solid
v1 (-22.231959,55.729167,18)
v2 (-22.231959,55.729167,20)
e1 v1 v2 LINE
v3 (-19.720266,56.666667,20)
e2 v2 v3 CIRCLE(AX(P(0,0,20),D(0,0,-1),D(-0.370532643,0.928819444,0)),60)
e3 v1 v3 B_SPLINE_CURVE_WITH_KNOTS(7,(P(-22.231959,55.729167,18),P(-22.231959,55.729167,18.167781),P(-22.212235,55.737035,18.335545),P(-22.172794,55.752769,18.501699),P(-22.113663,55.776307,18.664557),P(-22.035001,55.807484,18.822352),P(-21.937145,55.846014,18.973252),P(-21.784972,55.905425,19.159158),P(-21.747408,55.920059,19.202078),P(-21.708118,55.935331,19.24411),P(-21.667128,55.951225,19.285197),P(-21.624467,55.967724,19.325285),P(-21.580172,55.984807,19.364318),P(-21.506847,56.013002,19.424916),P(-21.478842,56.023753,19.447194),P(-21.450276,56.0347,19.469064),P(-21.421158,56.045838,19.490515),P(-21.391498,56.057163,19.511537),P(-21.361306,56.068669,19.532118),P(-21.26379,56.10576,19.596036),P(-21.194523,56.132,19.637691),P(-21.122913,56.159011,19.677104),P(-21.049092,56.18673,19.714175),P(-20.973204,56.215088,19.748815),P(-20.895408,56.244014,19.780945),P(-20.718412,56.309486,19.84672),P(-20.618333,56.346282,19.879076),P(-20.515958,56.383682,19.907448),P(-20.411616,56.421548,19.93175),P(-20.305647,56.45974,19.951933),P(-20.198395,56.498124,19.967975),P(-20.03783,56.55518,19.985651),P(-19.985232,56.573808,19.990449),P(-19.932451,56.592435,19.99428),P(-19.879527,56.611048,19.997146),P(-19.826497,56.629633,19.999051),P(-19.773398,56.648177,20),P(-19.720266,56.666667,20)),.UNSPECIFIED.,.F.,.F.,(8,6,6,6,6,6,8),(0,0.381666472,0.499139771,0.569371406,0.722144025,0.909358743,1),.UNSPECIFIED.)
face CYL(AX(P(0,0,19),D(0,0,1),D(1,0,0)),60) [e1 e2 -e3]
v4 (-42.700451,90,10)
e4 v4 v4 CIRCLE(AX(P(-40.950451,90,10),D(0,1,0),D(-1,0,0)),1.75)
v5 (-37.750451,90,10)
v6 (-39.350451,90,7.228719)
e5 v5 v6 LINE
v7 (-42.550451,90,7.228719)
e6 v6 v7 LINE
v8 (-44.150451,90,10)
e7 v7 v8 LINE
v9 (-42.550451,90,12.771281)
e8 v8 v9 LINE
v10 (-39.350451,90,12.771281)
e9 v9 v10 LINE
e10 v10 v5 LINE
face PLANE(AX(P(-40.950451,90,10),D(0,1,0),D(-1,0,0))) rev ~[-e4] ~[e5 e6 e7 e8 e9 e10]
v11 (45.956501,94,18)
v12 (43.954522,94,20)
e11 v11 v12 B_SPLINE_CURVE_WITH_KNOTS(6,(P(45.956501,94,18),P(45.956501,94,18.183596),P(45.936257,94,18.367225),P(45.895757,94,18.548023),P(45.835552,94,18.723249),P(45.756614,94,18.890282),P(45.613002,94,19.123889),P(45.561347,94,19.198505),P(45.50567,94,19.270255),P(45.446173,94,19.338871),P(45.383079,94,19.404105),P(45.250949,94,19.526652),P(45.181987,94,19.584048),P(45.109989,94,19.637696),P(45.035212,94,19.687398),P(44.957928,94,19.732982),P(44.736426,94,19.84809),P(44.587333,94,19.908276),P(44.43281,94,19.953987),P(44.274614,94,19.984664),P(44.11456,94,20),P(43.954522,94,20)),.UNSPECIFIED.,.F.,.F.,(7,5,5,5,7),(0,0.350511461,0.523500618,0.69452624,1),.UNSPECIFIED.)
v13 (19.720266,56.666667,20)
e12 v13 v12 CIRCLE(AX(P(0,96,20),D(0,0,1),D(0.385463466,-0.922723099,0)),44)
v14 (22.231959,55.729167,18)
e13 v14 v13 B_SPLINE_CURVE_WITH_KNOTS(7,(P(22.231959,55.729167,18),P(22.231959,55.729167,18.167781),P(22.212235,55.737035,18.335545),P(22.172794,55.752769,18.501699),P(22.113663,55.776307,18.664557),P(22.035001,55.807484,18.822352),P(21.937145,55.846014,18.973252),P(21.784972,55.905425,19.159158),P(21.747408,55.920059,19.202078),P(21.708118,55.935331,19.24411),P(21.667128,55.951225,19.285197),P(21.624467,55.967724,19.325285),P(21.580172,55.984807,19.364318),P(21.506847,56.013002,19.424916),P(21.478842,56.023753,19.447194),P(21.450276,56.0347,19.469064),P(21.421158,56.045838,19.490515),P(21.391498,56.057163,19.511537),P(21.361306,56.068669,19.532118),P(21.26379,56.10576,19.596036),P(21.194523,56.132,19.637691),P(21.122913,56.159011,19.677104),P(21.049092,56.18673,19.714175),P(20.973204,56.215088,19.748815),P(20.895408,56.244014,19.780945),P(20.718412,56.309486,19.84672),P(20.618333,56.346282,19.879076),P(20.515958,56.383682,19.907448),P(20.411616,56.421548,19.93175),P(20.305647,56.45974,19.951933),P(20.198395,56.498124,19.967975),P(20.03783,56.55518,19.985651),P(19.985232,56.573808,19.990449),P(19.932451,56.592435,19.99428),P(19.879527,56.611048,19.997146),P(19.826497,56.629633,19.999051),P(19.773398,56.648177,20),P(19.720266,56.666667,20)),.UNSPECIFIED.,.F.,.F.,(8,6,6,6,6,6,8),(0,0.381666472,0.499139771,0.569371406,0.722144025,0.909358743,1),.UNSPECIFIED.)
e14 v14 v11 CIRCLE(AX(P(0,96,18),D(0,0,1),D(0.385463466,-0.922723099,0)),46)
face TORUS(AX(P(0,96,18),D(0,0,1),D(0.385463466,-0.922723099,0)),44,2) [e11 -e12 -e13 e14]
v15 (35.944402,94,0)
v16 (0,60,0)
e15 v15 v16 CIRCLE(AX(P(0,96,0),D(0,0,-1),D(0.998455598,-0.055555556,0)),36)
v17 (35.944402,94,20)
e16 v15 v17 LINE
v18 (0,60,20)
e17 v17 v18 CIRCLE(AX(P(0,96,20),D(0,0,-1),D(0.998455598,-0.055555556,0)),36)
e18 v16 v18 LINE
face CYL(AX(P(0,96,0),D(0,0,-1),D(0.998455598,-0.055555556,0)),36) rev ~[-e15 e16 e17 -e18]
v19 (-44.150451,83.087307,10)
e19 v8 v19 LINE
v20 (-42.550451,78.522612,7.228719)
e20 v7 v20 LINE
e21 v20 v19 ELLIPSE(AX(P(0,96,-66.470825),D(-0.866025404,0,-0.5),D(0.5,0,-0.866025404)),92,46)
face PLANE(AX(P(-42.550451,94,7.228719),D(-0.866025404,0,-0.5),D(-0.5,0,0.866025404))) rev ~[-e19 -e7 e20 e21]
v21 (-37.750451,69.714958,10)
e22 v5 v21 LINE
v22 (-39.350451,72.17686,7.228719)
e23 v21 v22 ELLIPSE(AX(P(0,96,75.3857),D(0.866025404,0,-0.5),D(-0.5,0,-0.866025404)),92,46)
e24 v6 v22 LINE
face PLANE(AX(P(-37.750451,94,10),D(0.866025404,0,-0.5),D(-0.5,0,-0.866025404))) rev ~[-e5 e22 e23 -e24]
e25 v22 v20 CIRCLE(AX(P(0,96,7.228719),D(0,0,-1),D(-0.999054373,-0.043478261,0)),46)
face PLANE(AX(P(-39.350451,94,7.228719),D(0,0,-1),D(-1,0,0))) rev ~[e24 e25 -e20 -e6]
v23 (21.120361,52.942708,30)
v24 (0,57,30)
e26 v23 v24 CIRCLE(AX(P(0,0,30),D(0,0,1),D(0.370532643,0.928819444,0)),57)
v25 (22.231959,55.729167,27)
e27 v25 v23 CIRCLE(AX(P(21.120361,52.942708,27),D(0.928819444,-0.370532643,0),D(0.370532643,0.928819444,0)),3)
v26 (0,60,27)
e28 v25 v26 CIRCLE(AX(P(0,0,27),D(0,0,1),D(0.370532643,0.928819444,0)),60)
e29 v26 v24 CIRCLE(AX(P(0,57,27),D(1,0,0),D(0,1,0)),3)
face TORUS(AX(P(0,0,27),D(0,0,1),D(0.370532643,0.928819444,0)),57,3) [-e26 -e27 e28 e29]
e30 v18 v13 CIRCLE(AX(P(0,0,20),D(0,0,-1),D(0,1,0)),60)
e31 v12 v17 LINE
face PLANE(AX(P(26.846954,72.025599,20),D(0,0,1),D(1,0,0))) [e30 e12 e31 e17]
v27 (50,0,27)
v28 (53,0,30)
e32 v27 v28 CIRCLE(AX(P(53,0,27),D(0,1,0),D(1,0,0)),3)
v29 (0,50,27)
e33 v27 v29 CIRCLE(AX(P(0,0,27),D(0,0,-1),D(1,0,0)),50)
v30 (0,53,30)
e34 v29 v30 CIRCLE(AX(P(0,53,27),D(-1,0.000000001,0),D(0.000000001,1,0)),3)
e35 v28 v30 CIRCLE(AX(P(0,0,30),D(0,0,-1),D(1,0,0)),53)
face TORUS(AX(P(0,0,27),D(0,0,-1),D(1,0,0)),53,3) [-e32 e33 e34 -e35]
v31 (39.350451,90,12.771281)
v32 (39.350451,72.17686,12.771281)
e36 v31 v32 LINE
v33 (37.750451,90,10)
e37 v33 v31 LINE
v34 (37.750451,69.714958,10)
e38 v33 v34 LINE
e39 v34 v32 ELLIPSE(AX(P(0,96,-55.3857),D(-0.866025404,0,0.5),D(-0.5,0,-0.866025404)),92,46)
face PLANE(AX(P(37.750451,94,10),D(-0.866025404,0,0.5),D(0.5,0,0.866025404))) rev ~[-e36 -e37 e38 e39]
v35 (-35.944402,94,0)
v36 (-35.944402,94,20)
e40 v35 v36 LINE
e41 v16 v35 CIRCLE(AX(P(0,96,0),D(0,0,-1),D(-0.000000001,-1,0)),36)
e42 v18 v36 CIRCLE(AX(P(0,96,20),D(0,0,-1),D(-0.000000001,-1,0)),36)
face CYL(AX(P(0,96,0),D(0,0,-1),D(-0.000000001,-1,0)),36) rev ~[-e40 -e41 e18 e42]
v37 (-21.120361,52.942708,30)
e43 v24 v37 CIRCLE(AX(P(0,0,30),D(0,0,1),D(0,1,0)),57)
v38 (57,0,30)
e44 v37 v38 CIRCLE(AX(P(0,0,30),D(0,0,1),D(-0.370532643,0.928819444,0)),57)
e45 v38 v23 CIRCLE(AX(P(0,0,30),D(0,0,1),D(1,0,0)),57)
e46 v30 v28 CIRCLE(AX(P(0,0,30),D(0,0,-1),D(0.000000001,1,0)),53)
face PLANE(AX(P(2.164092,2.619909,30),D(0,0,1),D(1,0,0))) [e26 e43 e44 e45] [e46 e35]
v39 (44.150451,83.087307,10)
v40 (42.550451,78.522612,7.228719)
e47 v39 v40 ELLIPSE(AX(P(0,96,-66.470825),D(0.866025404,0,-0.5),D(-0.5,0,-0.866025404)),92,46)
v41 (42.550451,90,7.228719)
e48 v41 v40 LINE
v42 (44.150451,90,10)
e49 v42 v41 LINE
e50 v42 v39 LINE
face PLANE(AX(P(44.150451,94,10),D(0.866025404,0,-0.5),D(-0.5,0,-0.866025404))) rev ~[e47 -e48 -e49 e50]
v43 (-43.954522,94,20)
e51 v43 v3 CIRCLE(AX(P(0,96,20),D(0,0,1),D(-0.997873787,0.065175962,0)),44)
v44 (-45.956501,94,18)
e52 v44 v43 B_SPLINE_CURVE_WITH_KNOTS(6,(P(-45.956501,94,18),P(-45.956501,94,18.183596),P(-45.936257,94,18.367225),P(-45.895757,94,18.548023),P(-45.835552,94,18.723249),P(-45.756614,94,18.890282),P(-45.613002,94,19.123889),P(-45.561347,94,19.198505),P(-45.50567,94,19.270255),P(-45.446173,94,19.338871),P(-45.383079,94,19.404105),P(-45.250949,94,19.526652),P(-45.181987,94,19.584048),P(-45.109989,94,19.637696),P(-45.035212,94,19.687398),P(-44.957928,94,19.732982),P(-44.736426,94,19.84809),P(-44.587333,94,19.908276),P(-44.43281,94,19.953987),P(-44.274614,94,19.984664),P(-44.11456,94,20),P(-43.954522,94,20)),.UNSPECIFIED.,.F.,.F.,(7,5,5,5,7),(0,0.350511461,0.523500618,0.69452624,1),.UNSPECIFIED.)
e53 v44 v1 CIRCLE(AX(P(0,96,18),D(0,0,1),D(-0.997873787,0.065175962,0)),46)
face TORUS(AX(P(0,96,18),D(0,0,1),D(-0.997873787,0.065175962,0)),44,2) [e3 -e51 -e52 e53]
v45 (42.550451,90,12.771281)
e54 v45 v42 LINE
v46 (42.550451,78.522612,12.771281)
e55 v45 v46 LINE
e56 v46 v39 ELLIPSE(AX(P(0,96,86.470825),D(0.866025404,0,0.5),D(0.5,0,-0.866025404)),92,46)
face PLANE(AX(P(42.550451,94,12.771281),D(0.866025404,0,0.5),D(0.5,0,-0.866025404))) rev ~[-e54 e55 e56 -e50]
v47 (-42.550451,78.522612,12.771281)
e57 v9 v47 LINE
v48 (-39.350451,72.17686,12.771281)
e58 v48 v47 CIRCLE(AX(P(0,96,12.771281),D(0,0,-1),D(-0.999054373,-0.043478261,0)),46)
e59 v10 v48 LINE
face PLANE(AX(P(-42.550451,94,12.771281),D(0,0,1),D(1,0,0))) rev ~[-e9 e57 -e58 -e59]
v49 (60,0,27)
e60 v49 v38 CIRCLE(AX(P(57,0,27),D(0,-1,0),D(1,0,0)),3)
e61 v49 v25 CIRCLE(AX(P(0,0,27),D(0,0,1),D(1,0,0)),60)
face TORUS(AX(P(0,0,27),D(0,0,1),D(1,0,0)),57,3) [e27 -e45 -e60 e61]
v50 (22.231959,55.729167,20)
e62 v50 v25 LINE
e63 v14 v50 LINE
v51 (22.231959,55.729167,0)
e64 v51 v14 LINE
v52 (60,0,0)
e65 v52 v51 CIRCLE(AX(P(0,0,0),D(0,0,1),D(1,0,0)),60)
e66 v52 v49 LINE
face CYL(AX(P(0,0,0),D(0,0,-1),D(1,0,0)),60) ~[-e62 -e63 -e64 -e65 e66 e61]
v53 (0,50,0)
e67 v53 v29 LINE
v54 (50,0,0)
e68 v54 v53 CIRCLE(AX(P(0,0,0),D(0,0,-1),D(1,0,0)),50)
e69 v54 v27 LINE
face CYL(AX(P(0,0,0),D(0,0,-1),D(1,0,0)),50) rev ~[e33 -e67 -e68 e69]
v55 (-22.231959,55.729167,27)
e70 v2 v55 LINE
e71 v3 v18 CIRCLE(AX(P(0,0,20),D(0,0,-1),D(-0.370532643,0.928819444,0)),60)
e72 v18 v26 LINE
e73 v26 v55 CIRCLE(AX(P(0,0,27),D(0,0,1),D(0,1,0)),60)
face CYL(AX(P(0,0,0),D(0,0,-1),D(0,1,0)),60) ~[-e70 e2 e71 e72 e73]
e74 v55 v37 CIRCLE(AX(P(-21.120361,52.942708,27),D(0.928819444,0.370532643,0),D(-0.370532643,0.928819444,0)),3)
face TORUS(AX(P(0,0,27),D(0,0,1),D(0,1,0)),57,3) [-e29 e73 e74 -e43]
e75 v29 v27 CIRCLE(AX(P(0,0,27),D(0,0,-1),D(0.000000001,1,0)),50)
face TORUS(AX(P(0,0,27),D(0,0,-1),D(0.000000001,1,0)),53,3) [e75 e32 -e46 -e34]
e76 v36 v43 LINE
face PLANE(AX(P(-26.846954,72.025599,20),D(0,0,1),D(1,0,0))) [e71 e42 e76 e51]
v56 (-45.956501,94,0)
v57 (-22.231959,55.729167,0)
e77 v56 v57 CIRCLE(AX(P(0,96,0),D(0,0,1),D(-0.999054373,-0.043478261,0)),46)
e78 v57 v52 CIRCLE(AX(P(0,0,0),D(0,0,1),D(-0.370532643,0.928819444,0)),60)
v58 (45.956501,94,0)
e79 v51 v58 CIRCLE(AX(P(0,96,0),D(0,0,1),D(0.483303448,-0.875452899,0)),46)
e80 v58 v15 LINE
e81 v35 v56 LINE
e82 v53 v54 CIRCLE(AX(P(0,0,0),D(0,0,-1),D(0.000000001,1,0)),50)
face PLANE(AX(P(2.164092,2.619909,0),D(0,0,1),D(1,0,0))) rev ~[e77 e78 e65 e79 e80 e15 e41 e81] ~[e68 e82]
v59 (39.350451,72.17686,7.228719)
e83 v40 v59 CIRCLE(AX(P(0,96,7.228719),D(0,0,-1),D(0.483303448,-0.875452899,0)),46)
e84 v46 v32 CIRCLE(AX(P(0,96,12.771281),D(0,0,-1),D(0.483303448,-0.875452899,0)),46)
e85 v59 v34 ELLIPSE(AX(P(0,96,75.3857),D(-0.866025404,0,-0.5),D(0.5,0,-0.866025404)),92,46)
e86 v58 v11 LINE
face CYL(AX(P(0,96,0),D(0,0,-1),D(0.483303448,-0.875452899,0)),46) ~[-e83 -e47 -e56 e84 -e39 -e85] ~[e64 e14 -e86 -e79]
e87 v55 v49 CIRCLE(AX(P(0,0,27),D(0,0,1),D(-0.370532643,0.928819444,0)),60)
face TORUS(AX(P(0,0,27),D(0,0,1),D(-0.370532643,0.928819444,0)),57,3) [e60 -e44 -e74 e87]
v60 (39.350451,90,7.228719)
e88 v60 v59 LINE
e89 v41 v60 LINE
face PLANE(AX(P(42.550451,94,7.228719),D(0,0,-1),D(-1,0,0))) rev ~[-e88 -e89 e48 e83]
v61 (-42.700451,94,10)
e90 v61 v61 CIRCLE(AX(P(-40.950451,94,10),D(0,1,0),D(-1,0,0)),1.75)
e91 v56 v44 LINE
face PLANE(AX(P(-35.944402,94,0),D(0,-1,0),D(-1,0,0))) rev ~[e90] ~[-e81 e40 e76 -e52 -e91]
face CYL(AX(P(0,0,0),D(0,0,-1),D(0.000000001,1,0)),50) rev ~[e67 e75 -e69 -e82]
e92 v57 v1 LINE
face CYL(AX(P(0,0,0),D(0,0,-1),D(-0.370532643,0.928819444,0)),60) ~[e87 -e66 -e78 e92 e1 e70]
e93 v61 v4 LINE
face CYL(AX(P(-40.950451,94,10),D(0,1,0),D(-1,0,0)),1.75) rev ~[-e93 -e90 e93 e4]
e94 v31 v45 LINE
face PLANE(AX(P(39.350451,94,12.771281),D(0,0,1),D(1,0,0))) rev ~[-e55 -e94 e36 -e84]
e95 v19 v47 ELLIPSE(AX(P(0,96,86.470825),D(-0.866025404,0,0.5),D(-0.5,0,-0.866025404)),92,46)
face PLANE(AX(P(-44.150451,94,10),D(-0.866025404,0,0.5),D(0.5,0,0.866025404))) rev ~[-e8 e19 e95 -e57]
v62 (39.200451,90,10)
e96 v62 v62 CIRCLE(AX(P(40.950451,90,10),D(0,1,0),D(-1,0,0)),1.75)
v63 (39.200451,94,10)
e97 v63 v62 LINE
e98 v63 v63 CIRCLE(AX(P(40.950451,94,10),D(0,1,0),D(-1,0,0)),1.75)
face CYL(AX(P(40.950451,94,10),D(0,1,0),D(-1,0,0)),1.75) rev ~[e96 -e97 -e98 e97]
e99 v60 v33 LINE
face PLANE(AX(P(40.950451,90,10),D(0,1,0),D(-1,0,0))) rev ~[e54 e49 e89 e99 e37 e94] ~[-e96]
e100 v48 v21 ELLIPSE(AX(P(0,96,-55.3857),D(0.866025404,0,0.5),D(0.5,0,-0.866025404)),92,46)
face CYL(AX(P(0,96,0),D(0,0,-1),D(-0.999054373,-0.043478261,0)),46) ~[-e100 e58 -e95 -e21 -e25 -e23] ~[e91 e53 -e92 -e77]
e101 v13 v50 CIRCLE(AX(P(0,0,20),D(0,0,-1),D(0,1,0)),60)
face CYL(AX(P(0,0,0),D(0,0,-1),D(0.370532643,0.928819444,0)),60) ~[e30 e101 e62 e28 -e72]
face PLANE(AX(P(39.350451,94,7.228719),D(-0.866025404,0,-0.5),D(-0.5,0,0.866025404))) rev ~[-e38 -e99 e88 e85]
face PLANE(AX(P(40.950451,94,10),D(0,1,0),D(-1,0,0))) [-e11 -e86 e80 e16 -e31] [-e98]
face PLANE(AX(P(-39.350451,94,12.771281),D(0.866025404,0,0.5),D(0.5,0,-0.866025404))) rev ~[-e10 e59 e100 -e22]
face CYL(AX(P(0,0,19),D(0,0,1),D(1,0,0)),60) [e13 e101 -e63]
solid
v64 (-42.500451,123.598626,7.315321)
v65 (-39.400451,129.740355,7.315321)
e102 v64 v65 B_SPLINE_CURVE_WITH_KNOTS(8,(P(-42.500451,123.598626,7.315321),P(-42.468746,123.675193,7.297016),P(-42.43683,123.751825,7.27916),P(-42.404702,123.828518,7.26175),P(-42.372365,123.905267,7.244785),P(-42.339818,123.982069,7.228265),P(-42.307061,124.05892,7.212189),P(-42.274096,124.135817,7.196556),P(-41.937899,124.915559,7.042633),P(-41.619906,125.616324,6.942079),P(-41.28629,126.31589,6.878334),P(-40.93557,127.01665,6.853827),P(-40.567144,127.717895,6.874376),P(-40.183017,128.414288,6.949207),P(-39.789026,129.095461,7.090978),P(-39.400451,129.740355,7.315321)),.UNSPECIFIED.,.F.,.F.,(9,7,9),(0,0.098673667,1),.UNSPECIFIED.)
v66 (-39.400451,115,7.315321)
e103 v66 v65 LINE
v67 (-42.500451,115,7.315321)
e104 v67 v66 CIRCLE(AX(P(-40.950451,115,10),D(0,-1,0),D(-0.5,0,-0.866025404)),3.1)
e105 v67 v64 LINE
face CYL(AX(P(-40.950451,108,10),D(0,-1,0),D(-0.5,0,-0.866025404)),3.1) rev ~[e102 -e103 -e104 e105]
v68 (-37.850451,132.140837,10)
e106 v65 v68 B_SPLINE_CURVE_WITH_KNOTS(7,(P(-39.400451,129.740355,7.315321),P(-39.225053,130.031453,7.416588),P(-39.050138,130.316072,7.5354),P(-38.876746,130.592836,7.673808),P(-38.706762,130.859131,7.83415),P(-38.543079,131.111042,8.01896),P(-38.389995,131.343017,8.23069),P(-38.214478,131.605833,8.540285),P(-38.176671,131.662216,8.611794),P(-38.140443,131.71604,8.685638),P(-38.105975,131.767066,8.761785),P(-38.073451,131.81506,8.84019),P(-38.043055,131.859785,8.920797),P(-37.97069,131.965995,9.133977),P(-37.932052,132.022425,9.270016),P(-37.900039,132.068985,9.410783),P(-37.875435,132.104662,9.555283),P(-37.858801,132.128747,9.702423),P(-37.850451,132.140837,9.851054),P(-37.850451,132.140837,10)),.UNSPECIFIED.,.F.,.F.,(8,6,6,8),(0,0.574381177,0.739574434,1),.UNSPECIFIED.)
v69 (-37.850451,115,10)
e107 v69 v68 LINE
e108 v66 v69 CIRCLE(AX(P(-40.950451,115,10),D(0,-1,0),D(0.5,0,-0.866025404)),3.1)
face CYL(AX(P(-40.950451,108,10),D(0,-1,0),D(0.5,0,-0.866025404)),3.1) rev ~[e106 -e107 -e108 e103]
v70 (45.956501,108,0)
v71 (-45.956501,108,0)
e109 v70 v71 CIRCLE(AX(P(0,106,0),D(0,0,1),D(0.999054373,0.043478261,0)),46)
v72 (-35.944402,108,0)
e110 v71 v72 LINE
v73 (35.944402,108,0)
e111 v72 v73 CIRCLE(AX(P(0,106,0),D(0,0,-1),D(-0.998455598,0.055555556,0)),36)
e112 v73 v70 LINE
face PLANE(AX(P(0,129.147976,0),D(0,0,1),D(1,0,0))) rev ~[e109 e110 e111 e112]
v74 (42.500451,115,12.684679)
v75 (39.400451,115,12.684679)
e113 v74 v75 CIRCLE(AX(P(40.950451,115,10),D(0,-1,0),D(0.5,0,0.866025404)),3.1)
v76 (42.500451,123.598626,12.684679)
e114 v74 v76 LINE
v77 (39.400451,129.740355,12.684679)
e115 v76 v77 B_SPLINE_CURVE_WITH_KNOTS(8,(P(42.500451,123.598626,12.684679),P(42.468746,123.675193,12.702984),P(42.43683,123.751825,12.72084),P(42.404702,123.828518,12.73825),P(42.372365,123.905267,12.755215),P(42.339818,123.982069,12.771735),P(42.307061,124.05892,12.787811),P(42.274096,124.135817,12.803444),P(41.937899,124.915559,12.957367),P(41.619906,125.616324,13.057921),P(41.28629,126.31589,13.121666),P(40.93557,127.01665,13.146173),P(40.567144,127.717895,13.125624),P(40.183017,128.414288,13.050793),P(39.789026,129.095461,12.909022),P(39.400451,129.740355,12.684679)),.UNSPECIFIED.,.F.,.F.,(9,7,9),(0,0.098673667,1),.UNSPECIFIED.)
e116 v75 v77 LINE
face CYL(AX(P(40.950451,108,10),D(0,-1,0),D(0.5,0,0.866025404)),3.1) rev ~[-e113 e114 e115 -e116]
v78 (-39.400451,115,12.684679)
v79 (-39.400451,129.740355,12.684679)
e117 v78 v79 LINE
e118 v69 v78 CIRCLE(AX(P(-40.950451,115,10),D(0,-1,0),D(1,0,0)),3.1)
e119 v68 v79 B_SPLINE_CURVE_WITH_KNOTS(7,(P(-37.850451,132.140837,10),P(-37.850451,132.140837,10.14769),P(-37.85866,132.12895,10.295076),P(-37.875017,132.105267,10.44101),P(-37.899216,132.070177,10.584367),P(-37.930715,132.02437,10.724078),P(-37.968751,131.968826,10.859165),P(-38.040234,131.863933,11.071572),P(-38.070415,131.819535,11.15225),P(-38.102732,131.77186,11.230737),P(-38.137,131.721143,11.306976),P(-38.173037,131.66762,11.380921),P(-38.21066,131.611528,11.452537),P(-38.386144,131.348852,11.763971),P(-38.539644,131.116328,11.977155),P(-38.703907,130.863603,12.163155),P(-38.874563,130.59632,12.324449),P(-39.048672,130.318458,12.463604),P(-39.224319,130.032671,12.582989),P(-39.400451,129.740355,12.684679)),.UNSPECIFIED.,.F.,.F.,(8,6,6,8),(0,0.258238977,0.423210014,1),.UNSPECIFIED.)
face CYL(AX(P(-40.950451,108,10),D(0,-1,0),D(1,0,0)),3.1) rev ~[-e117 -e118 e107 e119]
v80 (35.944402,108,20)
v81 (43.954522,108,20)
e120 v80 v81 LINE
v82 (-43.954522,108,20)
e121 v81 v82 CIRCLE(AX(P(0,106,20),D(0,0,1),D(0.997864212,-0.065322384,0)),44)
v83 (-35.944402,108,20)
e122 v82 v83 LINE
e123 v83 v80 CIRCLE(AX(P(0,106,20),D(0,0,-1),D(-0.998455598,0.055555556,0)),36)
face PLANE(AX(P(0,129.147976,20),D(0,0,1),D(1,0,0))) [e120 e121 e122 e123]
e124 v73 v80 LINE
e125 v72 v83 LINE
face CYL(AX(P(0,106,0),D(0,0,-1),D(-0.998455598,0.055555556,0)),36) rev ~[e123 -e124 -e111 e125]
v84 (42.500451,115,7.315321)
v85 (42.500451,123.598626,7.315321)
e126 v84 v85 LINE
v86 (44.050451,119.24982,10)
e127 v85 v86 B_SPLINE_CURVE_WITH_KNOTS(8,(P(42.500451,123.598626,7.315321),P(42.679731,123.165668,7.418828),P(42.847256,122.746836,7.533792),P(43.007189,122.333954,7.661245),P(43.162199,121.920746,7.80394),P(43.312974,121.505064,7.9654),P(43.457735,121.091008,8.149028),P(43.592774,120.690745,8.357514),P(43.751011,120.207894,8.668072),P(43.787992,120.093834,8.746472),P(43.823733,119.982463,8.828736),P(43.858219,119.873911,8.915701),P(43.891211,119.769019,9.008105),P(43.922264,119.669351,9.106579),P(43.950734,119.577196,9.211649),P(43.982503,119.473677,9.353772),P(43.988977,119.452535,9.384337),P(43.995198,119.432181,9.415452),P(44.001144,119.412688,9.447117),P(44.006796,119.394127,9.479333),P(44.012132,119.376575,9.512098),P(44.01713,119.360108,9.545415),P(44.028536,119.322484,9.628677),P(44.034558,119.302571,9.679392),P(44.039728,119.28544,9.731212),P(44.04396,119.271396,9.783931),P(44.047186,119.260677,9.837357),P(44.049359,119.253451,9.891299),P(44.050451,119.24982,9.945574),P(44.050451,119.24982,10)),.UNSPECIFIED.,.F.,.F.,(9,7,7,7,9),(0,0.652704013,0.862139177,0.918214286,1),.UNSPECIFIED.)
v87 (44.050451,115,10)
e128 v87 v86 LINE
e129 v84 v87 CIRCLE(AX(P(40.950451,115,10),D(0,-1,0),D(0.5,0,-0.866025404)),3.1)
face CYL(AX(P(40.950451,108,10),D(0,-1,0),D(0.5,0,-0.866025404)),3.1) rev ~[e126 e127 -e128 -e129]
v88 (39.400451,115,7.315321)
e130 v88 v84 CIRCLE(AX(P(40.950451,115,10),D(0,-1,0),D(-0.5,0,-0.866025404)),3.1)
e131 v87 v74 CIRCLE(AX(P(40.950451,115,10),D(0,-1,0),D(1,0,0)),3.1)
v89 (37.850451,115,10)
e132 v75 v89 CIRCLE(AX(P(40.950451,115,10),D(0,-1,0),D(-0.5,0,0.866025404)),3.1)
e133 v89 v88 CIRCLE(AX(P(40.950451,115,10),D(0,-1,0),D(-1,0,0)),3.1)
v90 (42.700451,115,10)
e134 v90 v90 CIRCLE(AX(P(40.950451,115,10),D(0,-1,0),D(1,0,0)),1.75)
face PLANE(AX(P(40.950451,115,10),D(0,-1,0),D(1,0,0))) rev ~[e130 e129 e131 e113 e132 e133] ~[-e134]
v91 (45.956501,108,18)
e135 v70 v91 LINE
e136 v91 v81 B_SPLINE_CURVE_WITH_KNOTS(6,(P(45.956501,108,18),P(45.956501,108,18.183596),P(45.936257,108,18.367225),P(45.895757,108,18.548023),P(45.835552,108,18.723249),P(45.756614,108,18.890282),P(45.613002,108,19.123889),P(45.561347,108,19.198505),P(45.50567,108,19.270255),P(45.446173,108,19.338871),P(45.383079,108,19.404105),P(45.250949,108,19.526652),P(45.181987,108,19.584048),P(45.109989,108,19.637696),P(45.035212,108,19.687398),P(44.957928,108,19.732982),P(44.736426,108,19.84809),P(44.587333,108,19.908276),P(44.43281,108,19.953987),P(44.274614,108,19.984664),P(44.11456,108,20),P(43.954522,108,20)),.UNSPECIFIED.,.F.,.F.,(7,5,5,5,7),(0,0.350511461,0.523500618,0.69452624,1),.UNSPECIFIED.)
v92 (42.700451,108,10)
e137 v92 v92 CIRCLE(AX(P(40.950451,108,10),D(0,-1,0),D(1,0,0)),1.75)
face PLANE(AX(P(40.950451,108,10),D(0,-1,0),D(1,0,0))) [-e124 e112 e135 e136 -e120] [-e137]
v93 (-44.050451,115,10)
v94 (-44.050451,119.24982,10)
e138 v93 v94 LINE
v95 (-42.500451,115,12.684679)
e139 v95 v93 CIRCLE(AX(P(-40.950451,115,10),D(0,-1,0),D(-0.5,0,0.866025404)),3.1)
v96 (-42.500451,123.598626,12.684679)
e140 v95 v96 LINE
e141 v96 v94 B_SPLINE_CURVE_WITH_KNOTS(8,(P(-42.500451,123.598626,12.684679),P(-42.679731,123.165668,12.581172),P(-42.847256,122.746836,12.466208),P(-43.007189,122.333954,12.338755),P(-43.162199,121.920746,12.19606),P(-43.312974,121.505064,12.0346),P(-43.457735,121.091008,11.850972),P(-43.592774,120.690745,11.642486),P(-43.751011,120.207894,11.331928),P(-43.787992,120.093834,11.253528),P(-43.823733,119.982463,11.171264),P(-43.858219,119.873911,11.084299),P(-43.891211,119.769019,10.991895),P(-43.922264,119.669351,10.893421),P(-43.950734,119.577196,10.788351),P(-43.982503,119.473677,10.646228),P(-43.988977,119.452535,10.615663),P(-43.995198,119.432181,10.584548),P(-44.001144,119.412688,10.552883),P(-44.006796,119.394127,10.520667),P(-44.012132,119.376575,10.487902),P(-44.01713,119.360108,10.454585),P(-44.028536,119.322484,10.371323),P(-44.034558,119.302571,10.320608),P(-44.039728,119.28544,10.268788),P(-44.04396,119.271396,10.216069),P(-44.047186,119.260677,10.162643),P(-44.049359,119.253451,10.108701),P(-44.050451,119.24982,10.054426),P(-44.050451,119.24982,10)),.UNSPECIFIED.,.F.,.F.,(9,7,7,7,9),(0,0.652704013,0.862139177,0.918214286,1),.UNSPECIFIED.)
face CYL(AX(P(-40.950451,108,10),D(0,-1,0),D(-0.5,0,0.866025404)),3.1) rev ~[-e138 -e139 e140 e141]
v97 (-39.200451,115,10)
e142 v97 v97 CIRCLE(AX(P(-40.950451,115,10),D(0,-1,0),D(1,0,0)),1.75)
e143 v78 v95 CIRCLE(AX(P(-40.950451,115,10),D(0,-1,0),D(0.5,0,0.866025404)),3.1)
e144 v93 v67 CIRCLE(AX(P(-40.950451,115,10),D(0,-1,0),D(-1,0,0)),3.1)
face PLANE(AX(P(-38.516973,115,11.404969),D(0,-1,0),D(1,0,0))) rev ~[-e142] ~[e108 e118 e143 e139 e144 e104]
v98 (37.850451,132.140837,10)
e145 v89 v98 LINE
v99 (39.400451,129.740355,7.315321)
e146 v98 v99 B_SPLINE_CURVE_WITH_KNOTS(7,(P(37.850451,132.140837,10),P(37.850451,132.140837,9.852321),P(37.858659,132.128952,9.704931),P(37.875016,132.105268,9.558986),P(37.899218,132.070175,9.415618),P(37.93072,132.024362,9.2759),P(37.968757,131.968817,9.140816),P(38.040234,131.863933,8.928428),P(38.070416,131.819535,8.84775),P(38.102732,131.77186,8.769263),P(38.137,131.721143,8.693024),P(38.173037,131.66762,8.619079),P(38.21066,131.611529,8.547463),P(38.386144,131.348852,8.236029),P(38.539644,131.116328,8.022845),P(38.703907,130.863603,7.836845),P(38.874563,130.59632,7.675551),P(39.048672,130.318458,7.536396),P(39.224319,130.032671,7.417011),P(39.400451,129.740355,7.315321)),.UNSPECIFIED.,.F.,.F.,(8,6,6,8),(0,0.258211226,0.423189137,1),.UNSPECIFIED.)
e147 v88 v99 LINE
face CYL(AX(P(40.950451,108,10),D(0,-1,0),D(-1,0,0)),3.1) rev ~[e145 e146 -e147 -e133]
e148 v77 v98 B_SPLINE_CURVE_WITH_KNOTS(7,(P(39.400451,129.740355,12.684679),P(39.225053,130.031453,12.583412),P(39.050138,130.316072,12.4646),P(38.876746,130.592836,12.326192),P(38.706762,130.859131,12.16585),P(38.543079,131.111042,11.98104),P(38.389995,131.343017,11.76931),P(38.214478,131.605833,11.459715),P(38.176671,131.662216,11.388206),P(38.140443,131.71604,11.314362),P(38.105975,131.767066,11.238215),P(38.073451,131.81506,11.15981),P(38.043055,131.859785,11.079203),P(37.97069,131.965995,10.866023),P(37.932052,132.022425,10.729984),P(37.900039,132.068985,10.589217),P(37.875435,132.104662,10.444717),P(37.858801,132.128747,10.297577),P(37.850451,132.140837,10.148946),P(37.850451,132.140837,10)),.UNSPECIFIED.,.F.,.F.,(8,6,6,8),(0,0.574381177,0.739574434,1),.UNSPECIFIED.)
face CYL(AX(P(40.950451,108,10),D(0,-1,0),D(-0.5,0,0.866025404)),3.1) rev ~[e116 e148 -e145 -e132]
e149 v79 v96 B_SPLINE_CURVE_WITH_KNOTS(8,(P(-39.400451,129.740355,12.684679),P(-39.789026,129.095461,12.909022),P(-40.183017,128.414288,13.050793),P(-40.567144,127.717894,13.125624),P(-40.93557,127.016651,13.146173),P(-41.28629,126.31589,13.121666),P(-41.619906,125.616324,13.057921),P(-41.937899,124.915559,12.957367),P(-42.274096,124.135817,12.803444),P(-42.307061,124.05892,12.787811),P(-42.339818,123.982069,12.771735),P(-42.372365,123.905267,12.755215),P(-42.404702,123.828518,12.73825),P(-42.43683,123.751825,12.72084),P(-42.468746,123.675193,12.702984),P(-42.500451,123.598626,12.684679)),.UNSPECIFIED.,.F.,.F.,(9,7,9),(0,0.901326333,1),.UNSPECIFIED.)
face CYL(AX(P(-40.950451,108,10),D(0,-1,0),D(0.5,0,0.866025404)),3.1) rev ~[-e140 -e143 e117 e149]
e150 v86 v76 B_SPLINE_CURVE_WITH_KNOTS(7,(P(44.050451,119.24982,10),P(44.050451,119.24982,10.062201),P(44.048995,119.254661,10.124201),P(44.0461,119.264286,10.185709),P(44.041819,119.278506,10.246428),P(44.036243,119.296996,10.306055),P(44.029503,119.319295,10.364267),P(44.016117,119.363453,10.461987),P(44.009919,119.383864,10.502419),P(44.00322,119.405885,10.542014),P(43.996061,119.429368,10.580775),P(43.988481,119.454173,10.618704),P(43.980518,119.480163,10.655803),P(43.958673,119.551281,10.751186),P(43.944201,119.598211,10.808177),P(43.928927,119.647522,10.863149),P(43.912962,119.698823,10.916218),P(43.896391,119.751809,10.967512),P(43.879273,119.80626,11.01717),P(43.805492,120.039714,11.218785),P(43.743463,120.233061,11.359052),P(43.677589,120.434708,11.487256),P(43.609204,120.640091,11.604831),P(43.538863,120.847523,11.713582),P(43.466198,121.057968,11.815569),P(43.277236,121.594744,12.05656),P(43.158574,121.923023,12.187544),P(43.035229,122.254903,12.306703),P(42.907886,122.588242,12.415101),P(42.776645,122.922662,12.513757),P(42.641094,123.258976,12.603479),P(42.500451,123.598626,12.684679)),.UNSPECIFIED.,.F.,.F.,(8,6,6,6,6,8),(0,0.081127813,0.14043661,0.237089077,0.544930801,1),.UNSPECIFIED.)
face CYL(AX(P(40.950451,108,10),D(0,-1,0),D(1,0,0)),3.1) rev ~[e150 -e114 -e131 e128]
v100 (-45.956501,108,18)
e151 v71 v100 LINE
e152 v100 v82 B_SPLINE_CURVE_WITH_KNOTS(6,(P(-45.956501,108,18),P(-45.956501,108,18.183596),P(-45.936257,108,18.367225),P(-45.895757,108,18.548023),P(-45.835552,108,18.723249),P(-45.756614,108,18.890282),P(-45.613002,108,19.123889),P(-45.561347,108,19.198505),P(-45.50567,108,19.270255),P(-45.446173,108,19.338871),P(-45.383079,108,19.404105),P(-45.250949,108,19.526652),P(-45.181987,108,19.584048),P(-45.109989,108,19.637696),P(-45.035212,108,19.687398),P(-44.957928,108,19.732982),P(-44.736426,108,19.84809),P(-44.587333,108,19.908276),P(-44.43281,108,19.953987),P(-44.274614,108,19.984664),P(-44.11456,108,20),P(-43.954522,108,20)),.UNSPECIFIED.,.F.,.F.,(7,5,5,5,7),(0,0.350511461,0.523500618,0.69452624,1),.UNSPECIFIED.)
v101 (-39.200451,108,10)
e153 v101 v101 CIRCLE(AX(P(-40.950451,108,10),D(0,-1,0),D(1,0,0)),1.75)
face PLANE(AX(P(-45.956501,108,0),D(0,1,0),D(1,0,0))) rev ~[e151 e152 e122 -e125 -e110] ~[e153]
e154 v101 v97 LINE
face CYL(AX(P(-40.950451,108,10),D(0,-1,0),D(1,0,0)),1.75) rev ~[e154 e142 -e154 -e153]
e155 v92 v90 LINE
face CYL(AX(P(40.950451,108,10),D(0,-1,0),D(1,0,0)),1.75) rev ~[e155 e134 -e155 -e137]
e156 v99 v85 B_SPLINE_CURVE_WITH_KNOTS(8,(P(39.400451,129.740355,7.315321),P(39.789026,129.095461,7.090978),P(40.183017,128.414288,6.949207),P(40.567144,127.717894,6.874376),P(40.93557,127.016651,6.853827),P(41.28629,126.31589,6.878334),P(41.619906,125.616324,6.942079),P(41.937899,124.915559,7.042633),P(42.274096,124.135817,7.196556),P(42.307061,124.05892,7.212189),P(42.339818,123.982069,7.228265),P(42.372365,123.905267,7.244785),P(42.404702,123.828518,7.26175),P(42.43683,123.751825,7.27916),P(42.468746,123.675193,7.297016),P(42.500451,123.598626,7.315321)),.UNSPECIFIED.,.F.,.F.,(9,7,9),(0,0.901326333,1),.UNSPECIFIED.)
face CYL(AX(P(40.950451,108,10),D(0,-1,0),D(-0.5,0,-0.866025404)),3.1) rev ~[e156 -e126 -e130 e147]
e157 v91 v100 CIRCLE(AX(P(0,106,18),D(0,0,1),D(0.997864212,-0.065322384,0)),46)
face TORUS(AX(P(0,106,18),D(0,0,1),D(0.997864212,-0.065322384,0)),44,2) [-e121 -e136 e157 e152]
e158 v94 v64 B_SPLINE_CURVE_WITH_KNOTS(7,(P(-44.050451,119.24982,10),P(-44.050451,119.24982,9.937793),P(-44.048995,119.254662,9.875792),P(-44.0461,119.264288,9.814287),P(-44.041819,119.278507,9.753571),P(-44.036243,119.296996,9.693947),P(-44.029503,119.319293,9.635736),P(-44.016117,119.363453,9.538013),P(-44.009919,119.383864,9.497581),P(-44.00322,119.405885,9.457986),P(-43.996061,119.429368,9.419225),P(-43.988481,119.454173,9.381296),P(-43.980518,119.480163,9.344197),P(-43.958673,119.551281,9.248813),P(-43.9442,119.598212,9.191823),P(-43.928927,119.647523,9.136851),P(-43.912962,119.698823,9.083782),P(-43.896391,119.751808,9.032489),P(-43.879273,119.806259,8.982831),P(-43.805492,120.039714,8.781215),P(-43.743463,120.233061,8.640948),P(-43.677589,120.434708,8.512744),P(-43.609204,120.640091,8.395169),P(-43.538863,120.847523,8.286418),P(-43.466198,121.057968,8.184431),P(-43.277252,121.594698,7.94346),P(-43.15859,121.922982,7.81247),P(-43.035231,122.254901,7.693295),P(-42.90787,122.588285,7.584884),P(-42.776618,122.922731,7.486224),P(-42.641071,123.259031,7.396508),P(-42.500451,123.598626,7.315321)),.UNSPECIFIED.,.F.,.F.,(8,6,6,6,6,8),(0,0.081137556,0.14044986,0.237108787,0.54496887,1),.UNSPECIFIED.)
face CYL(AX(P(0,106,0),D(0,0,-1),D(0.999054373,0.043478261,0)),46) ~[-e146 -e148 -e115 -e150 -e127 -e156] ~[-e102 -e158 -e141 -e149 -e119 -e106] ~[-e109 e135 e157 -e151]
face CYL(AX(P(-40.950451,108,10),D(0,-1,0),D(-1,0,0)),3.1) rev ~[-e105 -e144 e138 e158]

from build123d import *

# Parameters (mm, degrees)
F1_DEPTH       = 20
F2_DEPTH       = 30
F3_R           = 1.75
F4_DEPTH       = 23.9
F5_DEPTH       = 25
F6_DEPTH       = 4
F7_R           = 1.75
F8_DEPTH       = 25
F9_DEPTH       = 25
F10_DEPTH      = 7
F11_R          = 3
F12_T4_ANGLE   = 71.0644406489
F12_S5_R       = 60
F12_T6_DEPTH   = 31
F12_T10_ANGLE  = 71.0644406489
F12_S11_R      = 60
F12_T12_DEPTH  = 31
F12_2_T2_ANGLE = 187.4907274343


# Not quite as in the source:
# - a fillet or chamfer that OpenCascade refuses, or shapes differently, is made with other operations: its cross-section is extruded or revolved along the edge and cut away or added


with BuildPart() as f1:
    # F0 (on Top) → F1 (new body)
    with BuildSketch(Plane.XY):
        with BuildLine():
            ThreePointArc((-2.47e-08, 60), (11.3192314105, 58.9226187493), (22.2319585876, 55.7291666667))
            ThreePointArc((22.2319585876, 55.7291666667), (39.0970674362, 71.763265115), (45.9565011723, 94))
            Line((45.9565011723, 94), (35.9444015112, 94))
            ThreePointArc((35.9444015112, 94), (24.7386337447, 69.8466063303), (-2.47e-08, 60))
        make_face()
    extrude(amount=F1_DEPTH)



with BuildPart() as f1b:
    # F0 (on Top) → F1, piece 2 (new body)
    with BuildSketch(Plane.XY):
        with BuildLine():
            ThreePointArc((-45.9565011723, 94), (-39.0970674362, 71.763265115), (-22.2319585876, 55.7291666667))
            ThreePointArc((-22.2319585876, 55.7291666667), (-11.3192314348, 58.9226187446), (-2.47e-08, 60))
            ThreePointArc((-2.47e-08, 60), (-24.7386337627, 69.8466063473), (-35.9444015112, 94))
            Line((-35.9444015112, 94), (-45.9565011723, 94))
        make_face()
    extrude(amount=F1_DEPTH)


with BuildPart() as f1c:
    # F0 (on Top) → F1, piece 3 (new body)
    with BuildSketch(Plane.XY):
        with BuildLine():
            Line((35.9444015112, 108), (45.9565011723, 108))
            ThreePointArc((45.9565011723, 108), (0, 152), (-45.9565011723, 108))
            Line((-45.9565011723, 108), (-35.9444015112, 108))
            ThreePointArc((-35.9444015112, 108), (0, 142), (35.9444015112, 108))
        make_face()
    extrude(amount=F1_DEPTH)

    # F7 (on face) → F8 (cut)
    with BuildSketch(Plane.XZ.offset(-108)):
        with Locations((-40.9504513418, 10)):
            Circle(F7_R)
        with Locations((40.9504513418, 10)):
            Circle(F7_R)
    extrude(amount=-F8_DEPTH, mode=Mode.SUBTRACT)

    # F7 (on face) → F9 (cut)
    with BuildSketch(Plane.XZ.offset(-108)):
        with BuildLine():
            Line((-39.4004513418, 12.6846787517), (-37.8504513418, 10))
            ThreePointArc((-37.8504513418, 10), (-38.26577259, 11.55), (-39.4004513418, 12.6846787517))
        make_face()
        Polygon((-42.5004513418, 7.3153212483), (-39.4004513418, 7.3153212483), (-37.8504513418, 10), (-39.4004513418, 12.6846787517), (-42.5004513418, 12.6846787517), (-44.0504513418, 10), align=None)
        with Locations((-40.9504513418, 10)):
            Circle(F7_R, mode=Mode.SUBTRACT)
        with BuildLine():
            Line((-42.5004513418, 12.6846787517), (-39.4004513418, 12.6846787517))
            ThreePointArc((-39.4004513418, 12.6846787517), (-40.9504513418, 13.1), (-42.5004513418, 12.6846787517))
        make_face()
        with BuildLine():
            ThreePointArc((-42.5004513418, 12.6846787517), (-43.6351300935, 11.55), (-44.0504513418, 10))
            Line((-44.0504513418, 10), (-42.5004513418, 12.6846787517))
        make_face()
        with BuildLine():
            ThreePointArc((-44.0504513418, 10), (-43.6351300935, 8.45), (-42.5004513418, 7.3153212483))
            Line((-42.5004513418, 7.3153212483), (-44.0504513418, 10))
        make_face()
        with BuildLine():
            ThreePointArc((-42.5004513418, 7.3153212483), (-40.9504513418, 6.9), (-39.4004513418, 7.3153212483))
            Line((-39.4004513418, 7.3153212483), (-42.5004513418, 7.3153212483))
        make_face()
        with BuildLine():
            Line((-37.8504513418, 10), (-39.4004513418, 7.3153212483))
            ThreePointArc((-39.4004513418, 7.3153212483), (-38.26577259, 8.45), (-37.8504513418, 10))
        make_face()
        with BuildLine():
            Line((37.8504513418, 10), (39.4004513418, 12.6846787517))
            ThreePointArc((39.4004513418, 12.6846787517), (38.26577259, 11.55), (37.8504513418, 10))
        make_face()
        Polygon((44.0504513418, 10), (42.5004513418, 12.6846787517), (39.4004513418, 12.6846787517), (37.8504513418, 10), (39.4004513418, 7.3153212483), (42.5004513418, 7.3153212483), align=None)
        with Locations((40.9504513418, 10)):
            Circle(F7_R, mode=Mode.SUBTRACT)
        with BuildLine():
            Line((39.4004513418, 12.6846787517), (42.5004513418, 12.6846787517))
            ThreePointArc((42.5004513418, 12.6846787517), (40.9504513418, 13.1), (39.4004513418, 12.6846787517))
        make_face()
        with BuildLine():
            ThreePointArc((44.0504513418, 10), (43.6351300935, 11.55), (42.5004513418, 12.6846787517))
            Line((42.5004513418, 12.6846787517), (44.0504513418, 10))
        make_face()
        with BuildLine():
            ThreePointArc((42.5004513418, 7.3153212483), (43.6351300935, 8.45), (44.0504513418, 10))
            Line((44.0504513418, 10), (42.5004513418, 7.3153212483))
        make_face()
        with BuildLine():
            Line((39.4004513418, 7.3153212483), (37.8504513418, 10))
            ThreePointArc((37.8504513418, 10), (38.26577259, 8.45), (39.4004513418, 7.3153212483))
        make_face()
        with BuildLine():
            ThreePointArc((39.4004513418, 7.3153212483), (40.9504513418, 6.9), (42.5004513418, 7.3153212483))
            Line((42.5004513418, 7.3153212483), (39.4004513418, 7.3153212483))
        make_face()
    extrude(amount=-F9_DEPTH, mode=Mode.SUBTRACT)

    # F7 (on face) → F10 (join)
    with BuildSketch(Plane.XZ.offset(-108)):
        Polygon((44.0504513418, 10), (42.5004513418, 12.6846787517), (39.4004513418, 12.6846787517), (37.8504513418, 10), (39.4004513418, 7.3153212483), (42.5004513418, 7.3153212483), align=None)
        with Locations((40.9504513418, 10)):
            Circle(F7_R, mode=Mode.SUBTRACT)
        with BuildLine():
            Line((37.8504513418, 10), (39.4004513418, 12.6846787517))
            ThreePointArc((39.4004513418, 12.6846787517), (38.26577259, 11.55), (37.8504513418, 10))
        make_face()
        with BuildLine():
            Line((39.4004513418, 7.3153212483), (37.8504513418, 10))
            ThreePointArc((37.8504513418, 10), (38.26577259, 8.45), (39.4004513418, 7.3153212483))
        make_face()
        with BuildLine():
            ThreePointArc((39.4004513418, 7.3153212483), (40.9504513418, 6.9), (42.5004513418, 7.3153212483))
            Line((42.5004513418, 7.3153212483), (39.4004513418, 7.3153212483))
        make_face()
        with BuildLine():
            ThreePointArc((42.5004513418, 7.3153212483), (43.6351300935, 8.45), (44.0504513418, 10))
            Line((44.0504513418, 10), (42.5004513418, 7.3153212483))
        make_face()
        with BuildLine():
            ThreePointArc((44.0504513418, 10), (43.6351300935, 11.55), (42.5004513418, 12.6846787517))
            Line((42.5004513418, 12.6846787517), (44.0504513418, 10))
        make_face()
        with BuildLine():
            Line((39.4004513418, 12.6846787517), (42.5004513418, 12.6846787517))
            ThreePointArc((42.5004513418, 12.6846787517), (40.9504513418, 13.1), (39.4004513418, 12.6846787517))
        make_face()
        with BuildLine():
            Line((-39.4004513418, 12.6846787517), (-37.8504513418, 10))
            ThreePointArc((-37.8504513418, 10), (-38.26577259, 11.55), (-39.4004513418, 12.6846787517))
        make_face()
        Polygon((-42.5004513418, 7.3153212483), (-39.4004513418, 7.3153212483), (-37.8504513418, 10), (-39.4004513418, 12.6846787517), (-42.5004513418, 12.6846787517), (-44.0504513418, 10), align=None)
        with Locations((-40.9504513418, 10)):
            Circle(F7_R, mode=Mode.SUBTRACT)
        with BuildLine():
            Line((-37.8504513418, 10), (-39.4004513418, 7.3153212483))
            ThreePointArc((-39.4004513418, 7.3153212483), (-38.26577259, 8.45), (-37.8504513418, 10))
        make_face()
        with BuildLine():
            ThreePointArc((-42.5004513418, 7.3153212483), (-40.9504513418, 6.9), (-39.4004513418, 7.3153212483))
            Line((-39.4004513418, 7.3153212483), (-42.5004513418, 7.3153212483))
        make_face()
        with BuildLine():
            ThreePointArc((-44.0504513418, 10), (-43.6351300935, 8.45), (-42.5004513418, 7.3153212483))
            Line((-42.5004513418, 7.3153212483), (-44.0504513418, 10))
        make_face()
        with BuildLine():
            ThreePointArc((-42.5004513418, 12.6846787517), (-43.6351300935, 11.55), (-44.0504513418, 10))
            Line((-44.0504513418, 10), (-42.5004513418, 12.6846787517))
        make_face()
        with BuildLine():
            Line((-42.5004513418, 12.6846787517), (-39.4004513418, 12.6846787517))
            ThreePointArc((-39.4004513418, 12.6846787517), (-40.9504513418, 13.1), (-42.5004513418, 12.6846787517))
        make_face()
    extrude(amount=-F10_DEPTH)

    # F12#2: fillet of radius 2 on 1 edges, made by hand

    # F12_2_s1 → F12_2_t2 (revolve, cut)
    with BuildSketch(Plane(origin=(6.909384127, 105.5476965336, 0), x_dir=(0, 0, 1), z_dir=(-0.0653223839, -0.9978642123, 0))):
        with BuildLine():
            ThreePointArc((18, -39.07582731), (19.4142135624, -38.4900408724), (20, -37.07582731))
            Line((20, -37.07582731), (20, -39.07582731))
            Line((20, -39.07582731), (18, -39.07582731))
        make_face()
    revolve(axis=Axis((0, 106, 20), (0, 0, 1)), revolution_arc=F12_2_T2_ANGLE, mode=Mode.SUBTRACT)


with BuildPart() as f1_1:
    add(f1.part)

    add(f1b.part)  # F2 merges F1b
    # F0 (on Top) → F2 (join)
    with BuildSketch(Plane.XY):
        with BuildLine():
            ThreePointArc((22.2319585876, 55.7291666667), (11.4791477819, 51.4553127051), (4.18e-08, 50))
            ThreePointArc((4.18e-08, 50), (-11.4791477414, 51.4553126946), (-22.2319585876, 55.7291666667))
            ThreePointArc((-22.2319585876, 55.7291666667), (-33.6606779845, -49.668488578), (60, 0))
            ThreePointArc((60, 0), (49.668488578, 33.6606779845), (22.2319585876, 55.7291666667))
        make_face()
        with BuildLine():
            ThreePointArc((4.18e-08, 50), (35.3553390741, 35.3553390445), (50, 0))
            ThreePointArc((50, 0), (-35.3553390741, -35.3553390445), (4.18e-08, 50))
        make_face(mode=Mode.SUBTRACT)
        with BuildLine():
            ThreePointArc((-22.2319585876, 55.7291666667), (-11.4791477414, 51.4553126946), (4.18e-08, 50))
            ThreePointArc((4.18e-08, 50), (11.4791477819, 51.4553127051), (22.2319585876, 55.7291666667))
            ThreePointArc((22.2319585876, 55.7291666667), (11.3192314105, 58.9226187493), (-2.47e-08, 60))
            ThreePointArc((-2.47e-08, 60), (-11.3192314348, 58.9226187446), (-22.2319585876, 55.7291666667))
        make_face()
    extrude(amount=F2_DEPTH)

    # F3 (on face) → F4 (cut)
    with BuildSketch(Plane(origin=(0, 94, 0), x_dir=(-1, 0, 0), z_dir=(0, 1, 0))):
        with Locations((-40.9504513418, 10)):
            Circle(F3_R)
        with Locations((40.9504513418, 10)):
            Circle(F3_R)
    extrude(amount=-F4_DEPTH, mode=Mode.SUBTRACT)

    # F3 (on face) → F5 (cut)
    with BuildSketch(Plane(origin=(0, 94, 0), x_dir=(-1, 0, 0), z_dir=(0, 1, 0))):
        Polygon((-42.5504513418, 7.2287187079), (-39.3504513418, 7.2287187079), (-37.7504513418, 10), (-39.3504513418, 12.7712812921), (-42.5504513418, 12.7712812921), (-44.1504513418, 10), align=None)
        with Locations((-40.9504513418, 10)):
            Circle(F3_R, mode=Mode.SUBTRACT)
        Polygon((42.5504513418, 12.7712812921), (39.3504513418, 12.7712812921), (37.7504513418, 10), (39.3504513418, 7.2287187079), (42.5504513418, 7.2287187079), (44.1504513418, 10), align=None)
        with Locations((40.9504513418, 10)):
            Circle(F3_R, mode=Mode.SUBTRACT)
    extrude(amount=-F5_DEPTH, mode=Mode.SUBTRACT)

    # F3 (on face) → F6 (join)
    with BuildSketch(Plane(origin=(0, 94, 0), x_dir=(-1, 0, 0), z_dir=(0, 1, 0))):
        Polygon((-42.5504513418, 7.2287187079), (-39.3504513418, 7.2287187079), (-37.7504513418, 10), (-39.3504513418, 12.7712812921), (-42.5504513418, 12.7712812921), (-44.1504513418, 10), align=None)
        with Locations((-40.9504513418, 10)):
            Circle(F3_R, mode=Mode.SUBTRACT)
        Polygon((42.5504513418, 12.7712812921), (39.3504513418, 12.7712812921), (37.7504513418, 10), (39.3504513418, 7.2287187079), (42.5504513418, 7.2287187079), (44.1504513418, 10), align=None)
        with Locations((40.9504513418, 10)):
            Circle(F3_R, mode=Mode.SUBTRACT)
    extrude(amount=-F6_DEPTH)

    # F11
    f11_edges = [f1_1.edges().sort_by_distance(p)[0] for p in [
        (-22.231959, -55.729167, 30),
        (0, -50, 30),
    ]]
    fillet(f11_edges, radius=F11_R)

    # F12: fillet of radius 2 on 2 edges, made by hand


with BuildPart() as f12_tool2:
    # F12_s3 → F12_t4 (revolve)
    with BuildSketch(Plane(origin=(34.1449001636, 14.2638799975, 0), x_dir=(0, 0, 1), z_dir=(-0.9227230986, -0.3854634656, 0))):
        with BuildLine():
            ThreePointArc((18, 42.5814174657), (19.4142135624, 43.1672039033), (20, 44.5814174657))
            Line((20, 44.5814174657), (20, 42.5814174657))
            Line((20, 42.5814174657), (18, 42.5814174657))
        make_face()
    revolve(axis=Axis((0, 96, 20), (0, 0, 1)), revolution_arc=F12_T4_ANGLE)

    # F12_s5 → F12_t6 (cut, symmetric)
    with BuildSketch(Plane.XY.offset(19)):
        Circle(F12_S5_R)
    extrude(amount=F12_T6_DEPTH, both=True, mode=Mode.SUBTRACT)


with BuildPart() as f1_2:
    add(f1_1.part)

    # F12_t1: cut F12_tool2
    add(f12_tool2.part, mode=Mode.SUBTRACT)


with BuildPart() as f12_tool8:
    # F12_s9 → F12_t10 (revolve)
    with BuildSketch(Plane(origin=(6.243588842, 95.5922010247, 0), x_dir=(0, 0, 1), z_dir=(0.0651759618, 0.9978737866, 0))):
        with BuildLine():
            ThreePointArc((18, -52.2568923302), (19.4142135624, -51.6711058926), (20, -50.2568923302))
            Line((20, -50.2568923302), (20, -52.2568923302))
            Line((20, -52.2568923302), (18, -52.2568923302))
        make_face()
    revolve(axis=Axis((0, 96, 20), (0, 0, 1)), revolution_arc=F12_T10_ANGLE)

    # F12_s11 → F12_t12 (cut, symmetric)
    with BuildSketch(Plane.XY.offset(19)):
        Circle(F12_S11_R)
    extrude(amount=F12_T12_DEPTH, both=True, mode=Mode.SUBTRACT)


with BuildPart() as f1_3:
    add(f1_2.part)

    # F12_t7: cut F12_tool8
    add(f12_tool8.part, mode=Mode.SUBTRACT)


solid = Compound([f1c.part, f1_3.part])
